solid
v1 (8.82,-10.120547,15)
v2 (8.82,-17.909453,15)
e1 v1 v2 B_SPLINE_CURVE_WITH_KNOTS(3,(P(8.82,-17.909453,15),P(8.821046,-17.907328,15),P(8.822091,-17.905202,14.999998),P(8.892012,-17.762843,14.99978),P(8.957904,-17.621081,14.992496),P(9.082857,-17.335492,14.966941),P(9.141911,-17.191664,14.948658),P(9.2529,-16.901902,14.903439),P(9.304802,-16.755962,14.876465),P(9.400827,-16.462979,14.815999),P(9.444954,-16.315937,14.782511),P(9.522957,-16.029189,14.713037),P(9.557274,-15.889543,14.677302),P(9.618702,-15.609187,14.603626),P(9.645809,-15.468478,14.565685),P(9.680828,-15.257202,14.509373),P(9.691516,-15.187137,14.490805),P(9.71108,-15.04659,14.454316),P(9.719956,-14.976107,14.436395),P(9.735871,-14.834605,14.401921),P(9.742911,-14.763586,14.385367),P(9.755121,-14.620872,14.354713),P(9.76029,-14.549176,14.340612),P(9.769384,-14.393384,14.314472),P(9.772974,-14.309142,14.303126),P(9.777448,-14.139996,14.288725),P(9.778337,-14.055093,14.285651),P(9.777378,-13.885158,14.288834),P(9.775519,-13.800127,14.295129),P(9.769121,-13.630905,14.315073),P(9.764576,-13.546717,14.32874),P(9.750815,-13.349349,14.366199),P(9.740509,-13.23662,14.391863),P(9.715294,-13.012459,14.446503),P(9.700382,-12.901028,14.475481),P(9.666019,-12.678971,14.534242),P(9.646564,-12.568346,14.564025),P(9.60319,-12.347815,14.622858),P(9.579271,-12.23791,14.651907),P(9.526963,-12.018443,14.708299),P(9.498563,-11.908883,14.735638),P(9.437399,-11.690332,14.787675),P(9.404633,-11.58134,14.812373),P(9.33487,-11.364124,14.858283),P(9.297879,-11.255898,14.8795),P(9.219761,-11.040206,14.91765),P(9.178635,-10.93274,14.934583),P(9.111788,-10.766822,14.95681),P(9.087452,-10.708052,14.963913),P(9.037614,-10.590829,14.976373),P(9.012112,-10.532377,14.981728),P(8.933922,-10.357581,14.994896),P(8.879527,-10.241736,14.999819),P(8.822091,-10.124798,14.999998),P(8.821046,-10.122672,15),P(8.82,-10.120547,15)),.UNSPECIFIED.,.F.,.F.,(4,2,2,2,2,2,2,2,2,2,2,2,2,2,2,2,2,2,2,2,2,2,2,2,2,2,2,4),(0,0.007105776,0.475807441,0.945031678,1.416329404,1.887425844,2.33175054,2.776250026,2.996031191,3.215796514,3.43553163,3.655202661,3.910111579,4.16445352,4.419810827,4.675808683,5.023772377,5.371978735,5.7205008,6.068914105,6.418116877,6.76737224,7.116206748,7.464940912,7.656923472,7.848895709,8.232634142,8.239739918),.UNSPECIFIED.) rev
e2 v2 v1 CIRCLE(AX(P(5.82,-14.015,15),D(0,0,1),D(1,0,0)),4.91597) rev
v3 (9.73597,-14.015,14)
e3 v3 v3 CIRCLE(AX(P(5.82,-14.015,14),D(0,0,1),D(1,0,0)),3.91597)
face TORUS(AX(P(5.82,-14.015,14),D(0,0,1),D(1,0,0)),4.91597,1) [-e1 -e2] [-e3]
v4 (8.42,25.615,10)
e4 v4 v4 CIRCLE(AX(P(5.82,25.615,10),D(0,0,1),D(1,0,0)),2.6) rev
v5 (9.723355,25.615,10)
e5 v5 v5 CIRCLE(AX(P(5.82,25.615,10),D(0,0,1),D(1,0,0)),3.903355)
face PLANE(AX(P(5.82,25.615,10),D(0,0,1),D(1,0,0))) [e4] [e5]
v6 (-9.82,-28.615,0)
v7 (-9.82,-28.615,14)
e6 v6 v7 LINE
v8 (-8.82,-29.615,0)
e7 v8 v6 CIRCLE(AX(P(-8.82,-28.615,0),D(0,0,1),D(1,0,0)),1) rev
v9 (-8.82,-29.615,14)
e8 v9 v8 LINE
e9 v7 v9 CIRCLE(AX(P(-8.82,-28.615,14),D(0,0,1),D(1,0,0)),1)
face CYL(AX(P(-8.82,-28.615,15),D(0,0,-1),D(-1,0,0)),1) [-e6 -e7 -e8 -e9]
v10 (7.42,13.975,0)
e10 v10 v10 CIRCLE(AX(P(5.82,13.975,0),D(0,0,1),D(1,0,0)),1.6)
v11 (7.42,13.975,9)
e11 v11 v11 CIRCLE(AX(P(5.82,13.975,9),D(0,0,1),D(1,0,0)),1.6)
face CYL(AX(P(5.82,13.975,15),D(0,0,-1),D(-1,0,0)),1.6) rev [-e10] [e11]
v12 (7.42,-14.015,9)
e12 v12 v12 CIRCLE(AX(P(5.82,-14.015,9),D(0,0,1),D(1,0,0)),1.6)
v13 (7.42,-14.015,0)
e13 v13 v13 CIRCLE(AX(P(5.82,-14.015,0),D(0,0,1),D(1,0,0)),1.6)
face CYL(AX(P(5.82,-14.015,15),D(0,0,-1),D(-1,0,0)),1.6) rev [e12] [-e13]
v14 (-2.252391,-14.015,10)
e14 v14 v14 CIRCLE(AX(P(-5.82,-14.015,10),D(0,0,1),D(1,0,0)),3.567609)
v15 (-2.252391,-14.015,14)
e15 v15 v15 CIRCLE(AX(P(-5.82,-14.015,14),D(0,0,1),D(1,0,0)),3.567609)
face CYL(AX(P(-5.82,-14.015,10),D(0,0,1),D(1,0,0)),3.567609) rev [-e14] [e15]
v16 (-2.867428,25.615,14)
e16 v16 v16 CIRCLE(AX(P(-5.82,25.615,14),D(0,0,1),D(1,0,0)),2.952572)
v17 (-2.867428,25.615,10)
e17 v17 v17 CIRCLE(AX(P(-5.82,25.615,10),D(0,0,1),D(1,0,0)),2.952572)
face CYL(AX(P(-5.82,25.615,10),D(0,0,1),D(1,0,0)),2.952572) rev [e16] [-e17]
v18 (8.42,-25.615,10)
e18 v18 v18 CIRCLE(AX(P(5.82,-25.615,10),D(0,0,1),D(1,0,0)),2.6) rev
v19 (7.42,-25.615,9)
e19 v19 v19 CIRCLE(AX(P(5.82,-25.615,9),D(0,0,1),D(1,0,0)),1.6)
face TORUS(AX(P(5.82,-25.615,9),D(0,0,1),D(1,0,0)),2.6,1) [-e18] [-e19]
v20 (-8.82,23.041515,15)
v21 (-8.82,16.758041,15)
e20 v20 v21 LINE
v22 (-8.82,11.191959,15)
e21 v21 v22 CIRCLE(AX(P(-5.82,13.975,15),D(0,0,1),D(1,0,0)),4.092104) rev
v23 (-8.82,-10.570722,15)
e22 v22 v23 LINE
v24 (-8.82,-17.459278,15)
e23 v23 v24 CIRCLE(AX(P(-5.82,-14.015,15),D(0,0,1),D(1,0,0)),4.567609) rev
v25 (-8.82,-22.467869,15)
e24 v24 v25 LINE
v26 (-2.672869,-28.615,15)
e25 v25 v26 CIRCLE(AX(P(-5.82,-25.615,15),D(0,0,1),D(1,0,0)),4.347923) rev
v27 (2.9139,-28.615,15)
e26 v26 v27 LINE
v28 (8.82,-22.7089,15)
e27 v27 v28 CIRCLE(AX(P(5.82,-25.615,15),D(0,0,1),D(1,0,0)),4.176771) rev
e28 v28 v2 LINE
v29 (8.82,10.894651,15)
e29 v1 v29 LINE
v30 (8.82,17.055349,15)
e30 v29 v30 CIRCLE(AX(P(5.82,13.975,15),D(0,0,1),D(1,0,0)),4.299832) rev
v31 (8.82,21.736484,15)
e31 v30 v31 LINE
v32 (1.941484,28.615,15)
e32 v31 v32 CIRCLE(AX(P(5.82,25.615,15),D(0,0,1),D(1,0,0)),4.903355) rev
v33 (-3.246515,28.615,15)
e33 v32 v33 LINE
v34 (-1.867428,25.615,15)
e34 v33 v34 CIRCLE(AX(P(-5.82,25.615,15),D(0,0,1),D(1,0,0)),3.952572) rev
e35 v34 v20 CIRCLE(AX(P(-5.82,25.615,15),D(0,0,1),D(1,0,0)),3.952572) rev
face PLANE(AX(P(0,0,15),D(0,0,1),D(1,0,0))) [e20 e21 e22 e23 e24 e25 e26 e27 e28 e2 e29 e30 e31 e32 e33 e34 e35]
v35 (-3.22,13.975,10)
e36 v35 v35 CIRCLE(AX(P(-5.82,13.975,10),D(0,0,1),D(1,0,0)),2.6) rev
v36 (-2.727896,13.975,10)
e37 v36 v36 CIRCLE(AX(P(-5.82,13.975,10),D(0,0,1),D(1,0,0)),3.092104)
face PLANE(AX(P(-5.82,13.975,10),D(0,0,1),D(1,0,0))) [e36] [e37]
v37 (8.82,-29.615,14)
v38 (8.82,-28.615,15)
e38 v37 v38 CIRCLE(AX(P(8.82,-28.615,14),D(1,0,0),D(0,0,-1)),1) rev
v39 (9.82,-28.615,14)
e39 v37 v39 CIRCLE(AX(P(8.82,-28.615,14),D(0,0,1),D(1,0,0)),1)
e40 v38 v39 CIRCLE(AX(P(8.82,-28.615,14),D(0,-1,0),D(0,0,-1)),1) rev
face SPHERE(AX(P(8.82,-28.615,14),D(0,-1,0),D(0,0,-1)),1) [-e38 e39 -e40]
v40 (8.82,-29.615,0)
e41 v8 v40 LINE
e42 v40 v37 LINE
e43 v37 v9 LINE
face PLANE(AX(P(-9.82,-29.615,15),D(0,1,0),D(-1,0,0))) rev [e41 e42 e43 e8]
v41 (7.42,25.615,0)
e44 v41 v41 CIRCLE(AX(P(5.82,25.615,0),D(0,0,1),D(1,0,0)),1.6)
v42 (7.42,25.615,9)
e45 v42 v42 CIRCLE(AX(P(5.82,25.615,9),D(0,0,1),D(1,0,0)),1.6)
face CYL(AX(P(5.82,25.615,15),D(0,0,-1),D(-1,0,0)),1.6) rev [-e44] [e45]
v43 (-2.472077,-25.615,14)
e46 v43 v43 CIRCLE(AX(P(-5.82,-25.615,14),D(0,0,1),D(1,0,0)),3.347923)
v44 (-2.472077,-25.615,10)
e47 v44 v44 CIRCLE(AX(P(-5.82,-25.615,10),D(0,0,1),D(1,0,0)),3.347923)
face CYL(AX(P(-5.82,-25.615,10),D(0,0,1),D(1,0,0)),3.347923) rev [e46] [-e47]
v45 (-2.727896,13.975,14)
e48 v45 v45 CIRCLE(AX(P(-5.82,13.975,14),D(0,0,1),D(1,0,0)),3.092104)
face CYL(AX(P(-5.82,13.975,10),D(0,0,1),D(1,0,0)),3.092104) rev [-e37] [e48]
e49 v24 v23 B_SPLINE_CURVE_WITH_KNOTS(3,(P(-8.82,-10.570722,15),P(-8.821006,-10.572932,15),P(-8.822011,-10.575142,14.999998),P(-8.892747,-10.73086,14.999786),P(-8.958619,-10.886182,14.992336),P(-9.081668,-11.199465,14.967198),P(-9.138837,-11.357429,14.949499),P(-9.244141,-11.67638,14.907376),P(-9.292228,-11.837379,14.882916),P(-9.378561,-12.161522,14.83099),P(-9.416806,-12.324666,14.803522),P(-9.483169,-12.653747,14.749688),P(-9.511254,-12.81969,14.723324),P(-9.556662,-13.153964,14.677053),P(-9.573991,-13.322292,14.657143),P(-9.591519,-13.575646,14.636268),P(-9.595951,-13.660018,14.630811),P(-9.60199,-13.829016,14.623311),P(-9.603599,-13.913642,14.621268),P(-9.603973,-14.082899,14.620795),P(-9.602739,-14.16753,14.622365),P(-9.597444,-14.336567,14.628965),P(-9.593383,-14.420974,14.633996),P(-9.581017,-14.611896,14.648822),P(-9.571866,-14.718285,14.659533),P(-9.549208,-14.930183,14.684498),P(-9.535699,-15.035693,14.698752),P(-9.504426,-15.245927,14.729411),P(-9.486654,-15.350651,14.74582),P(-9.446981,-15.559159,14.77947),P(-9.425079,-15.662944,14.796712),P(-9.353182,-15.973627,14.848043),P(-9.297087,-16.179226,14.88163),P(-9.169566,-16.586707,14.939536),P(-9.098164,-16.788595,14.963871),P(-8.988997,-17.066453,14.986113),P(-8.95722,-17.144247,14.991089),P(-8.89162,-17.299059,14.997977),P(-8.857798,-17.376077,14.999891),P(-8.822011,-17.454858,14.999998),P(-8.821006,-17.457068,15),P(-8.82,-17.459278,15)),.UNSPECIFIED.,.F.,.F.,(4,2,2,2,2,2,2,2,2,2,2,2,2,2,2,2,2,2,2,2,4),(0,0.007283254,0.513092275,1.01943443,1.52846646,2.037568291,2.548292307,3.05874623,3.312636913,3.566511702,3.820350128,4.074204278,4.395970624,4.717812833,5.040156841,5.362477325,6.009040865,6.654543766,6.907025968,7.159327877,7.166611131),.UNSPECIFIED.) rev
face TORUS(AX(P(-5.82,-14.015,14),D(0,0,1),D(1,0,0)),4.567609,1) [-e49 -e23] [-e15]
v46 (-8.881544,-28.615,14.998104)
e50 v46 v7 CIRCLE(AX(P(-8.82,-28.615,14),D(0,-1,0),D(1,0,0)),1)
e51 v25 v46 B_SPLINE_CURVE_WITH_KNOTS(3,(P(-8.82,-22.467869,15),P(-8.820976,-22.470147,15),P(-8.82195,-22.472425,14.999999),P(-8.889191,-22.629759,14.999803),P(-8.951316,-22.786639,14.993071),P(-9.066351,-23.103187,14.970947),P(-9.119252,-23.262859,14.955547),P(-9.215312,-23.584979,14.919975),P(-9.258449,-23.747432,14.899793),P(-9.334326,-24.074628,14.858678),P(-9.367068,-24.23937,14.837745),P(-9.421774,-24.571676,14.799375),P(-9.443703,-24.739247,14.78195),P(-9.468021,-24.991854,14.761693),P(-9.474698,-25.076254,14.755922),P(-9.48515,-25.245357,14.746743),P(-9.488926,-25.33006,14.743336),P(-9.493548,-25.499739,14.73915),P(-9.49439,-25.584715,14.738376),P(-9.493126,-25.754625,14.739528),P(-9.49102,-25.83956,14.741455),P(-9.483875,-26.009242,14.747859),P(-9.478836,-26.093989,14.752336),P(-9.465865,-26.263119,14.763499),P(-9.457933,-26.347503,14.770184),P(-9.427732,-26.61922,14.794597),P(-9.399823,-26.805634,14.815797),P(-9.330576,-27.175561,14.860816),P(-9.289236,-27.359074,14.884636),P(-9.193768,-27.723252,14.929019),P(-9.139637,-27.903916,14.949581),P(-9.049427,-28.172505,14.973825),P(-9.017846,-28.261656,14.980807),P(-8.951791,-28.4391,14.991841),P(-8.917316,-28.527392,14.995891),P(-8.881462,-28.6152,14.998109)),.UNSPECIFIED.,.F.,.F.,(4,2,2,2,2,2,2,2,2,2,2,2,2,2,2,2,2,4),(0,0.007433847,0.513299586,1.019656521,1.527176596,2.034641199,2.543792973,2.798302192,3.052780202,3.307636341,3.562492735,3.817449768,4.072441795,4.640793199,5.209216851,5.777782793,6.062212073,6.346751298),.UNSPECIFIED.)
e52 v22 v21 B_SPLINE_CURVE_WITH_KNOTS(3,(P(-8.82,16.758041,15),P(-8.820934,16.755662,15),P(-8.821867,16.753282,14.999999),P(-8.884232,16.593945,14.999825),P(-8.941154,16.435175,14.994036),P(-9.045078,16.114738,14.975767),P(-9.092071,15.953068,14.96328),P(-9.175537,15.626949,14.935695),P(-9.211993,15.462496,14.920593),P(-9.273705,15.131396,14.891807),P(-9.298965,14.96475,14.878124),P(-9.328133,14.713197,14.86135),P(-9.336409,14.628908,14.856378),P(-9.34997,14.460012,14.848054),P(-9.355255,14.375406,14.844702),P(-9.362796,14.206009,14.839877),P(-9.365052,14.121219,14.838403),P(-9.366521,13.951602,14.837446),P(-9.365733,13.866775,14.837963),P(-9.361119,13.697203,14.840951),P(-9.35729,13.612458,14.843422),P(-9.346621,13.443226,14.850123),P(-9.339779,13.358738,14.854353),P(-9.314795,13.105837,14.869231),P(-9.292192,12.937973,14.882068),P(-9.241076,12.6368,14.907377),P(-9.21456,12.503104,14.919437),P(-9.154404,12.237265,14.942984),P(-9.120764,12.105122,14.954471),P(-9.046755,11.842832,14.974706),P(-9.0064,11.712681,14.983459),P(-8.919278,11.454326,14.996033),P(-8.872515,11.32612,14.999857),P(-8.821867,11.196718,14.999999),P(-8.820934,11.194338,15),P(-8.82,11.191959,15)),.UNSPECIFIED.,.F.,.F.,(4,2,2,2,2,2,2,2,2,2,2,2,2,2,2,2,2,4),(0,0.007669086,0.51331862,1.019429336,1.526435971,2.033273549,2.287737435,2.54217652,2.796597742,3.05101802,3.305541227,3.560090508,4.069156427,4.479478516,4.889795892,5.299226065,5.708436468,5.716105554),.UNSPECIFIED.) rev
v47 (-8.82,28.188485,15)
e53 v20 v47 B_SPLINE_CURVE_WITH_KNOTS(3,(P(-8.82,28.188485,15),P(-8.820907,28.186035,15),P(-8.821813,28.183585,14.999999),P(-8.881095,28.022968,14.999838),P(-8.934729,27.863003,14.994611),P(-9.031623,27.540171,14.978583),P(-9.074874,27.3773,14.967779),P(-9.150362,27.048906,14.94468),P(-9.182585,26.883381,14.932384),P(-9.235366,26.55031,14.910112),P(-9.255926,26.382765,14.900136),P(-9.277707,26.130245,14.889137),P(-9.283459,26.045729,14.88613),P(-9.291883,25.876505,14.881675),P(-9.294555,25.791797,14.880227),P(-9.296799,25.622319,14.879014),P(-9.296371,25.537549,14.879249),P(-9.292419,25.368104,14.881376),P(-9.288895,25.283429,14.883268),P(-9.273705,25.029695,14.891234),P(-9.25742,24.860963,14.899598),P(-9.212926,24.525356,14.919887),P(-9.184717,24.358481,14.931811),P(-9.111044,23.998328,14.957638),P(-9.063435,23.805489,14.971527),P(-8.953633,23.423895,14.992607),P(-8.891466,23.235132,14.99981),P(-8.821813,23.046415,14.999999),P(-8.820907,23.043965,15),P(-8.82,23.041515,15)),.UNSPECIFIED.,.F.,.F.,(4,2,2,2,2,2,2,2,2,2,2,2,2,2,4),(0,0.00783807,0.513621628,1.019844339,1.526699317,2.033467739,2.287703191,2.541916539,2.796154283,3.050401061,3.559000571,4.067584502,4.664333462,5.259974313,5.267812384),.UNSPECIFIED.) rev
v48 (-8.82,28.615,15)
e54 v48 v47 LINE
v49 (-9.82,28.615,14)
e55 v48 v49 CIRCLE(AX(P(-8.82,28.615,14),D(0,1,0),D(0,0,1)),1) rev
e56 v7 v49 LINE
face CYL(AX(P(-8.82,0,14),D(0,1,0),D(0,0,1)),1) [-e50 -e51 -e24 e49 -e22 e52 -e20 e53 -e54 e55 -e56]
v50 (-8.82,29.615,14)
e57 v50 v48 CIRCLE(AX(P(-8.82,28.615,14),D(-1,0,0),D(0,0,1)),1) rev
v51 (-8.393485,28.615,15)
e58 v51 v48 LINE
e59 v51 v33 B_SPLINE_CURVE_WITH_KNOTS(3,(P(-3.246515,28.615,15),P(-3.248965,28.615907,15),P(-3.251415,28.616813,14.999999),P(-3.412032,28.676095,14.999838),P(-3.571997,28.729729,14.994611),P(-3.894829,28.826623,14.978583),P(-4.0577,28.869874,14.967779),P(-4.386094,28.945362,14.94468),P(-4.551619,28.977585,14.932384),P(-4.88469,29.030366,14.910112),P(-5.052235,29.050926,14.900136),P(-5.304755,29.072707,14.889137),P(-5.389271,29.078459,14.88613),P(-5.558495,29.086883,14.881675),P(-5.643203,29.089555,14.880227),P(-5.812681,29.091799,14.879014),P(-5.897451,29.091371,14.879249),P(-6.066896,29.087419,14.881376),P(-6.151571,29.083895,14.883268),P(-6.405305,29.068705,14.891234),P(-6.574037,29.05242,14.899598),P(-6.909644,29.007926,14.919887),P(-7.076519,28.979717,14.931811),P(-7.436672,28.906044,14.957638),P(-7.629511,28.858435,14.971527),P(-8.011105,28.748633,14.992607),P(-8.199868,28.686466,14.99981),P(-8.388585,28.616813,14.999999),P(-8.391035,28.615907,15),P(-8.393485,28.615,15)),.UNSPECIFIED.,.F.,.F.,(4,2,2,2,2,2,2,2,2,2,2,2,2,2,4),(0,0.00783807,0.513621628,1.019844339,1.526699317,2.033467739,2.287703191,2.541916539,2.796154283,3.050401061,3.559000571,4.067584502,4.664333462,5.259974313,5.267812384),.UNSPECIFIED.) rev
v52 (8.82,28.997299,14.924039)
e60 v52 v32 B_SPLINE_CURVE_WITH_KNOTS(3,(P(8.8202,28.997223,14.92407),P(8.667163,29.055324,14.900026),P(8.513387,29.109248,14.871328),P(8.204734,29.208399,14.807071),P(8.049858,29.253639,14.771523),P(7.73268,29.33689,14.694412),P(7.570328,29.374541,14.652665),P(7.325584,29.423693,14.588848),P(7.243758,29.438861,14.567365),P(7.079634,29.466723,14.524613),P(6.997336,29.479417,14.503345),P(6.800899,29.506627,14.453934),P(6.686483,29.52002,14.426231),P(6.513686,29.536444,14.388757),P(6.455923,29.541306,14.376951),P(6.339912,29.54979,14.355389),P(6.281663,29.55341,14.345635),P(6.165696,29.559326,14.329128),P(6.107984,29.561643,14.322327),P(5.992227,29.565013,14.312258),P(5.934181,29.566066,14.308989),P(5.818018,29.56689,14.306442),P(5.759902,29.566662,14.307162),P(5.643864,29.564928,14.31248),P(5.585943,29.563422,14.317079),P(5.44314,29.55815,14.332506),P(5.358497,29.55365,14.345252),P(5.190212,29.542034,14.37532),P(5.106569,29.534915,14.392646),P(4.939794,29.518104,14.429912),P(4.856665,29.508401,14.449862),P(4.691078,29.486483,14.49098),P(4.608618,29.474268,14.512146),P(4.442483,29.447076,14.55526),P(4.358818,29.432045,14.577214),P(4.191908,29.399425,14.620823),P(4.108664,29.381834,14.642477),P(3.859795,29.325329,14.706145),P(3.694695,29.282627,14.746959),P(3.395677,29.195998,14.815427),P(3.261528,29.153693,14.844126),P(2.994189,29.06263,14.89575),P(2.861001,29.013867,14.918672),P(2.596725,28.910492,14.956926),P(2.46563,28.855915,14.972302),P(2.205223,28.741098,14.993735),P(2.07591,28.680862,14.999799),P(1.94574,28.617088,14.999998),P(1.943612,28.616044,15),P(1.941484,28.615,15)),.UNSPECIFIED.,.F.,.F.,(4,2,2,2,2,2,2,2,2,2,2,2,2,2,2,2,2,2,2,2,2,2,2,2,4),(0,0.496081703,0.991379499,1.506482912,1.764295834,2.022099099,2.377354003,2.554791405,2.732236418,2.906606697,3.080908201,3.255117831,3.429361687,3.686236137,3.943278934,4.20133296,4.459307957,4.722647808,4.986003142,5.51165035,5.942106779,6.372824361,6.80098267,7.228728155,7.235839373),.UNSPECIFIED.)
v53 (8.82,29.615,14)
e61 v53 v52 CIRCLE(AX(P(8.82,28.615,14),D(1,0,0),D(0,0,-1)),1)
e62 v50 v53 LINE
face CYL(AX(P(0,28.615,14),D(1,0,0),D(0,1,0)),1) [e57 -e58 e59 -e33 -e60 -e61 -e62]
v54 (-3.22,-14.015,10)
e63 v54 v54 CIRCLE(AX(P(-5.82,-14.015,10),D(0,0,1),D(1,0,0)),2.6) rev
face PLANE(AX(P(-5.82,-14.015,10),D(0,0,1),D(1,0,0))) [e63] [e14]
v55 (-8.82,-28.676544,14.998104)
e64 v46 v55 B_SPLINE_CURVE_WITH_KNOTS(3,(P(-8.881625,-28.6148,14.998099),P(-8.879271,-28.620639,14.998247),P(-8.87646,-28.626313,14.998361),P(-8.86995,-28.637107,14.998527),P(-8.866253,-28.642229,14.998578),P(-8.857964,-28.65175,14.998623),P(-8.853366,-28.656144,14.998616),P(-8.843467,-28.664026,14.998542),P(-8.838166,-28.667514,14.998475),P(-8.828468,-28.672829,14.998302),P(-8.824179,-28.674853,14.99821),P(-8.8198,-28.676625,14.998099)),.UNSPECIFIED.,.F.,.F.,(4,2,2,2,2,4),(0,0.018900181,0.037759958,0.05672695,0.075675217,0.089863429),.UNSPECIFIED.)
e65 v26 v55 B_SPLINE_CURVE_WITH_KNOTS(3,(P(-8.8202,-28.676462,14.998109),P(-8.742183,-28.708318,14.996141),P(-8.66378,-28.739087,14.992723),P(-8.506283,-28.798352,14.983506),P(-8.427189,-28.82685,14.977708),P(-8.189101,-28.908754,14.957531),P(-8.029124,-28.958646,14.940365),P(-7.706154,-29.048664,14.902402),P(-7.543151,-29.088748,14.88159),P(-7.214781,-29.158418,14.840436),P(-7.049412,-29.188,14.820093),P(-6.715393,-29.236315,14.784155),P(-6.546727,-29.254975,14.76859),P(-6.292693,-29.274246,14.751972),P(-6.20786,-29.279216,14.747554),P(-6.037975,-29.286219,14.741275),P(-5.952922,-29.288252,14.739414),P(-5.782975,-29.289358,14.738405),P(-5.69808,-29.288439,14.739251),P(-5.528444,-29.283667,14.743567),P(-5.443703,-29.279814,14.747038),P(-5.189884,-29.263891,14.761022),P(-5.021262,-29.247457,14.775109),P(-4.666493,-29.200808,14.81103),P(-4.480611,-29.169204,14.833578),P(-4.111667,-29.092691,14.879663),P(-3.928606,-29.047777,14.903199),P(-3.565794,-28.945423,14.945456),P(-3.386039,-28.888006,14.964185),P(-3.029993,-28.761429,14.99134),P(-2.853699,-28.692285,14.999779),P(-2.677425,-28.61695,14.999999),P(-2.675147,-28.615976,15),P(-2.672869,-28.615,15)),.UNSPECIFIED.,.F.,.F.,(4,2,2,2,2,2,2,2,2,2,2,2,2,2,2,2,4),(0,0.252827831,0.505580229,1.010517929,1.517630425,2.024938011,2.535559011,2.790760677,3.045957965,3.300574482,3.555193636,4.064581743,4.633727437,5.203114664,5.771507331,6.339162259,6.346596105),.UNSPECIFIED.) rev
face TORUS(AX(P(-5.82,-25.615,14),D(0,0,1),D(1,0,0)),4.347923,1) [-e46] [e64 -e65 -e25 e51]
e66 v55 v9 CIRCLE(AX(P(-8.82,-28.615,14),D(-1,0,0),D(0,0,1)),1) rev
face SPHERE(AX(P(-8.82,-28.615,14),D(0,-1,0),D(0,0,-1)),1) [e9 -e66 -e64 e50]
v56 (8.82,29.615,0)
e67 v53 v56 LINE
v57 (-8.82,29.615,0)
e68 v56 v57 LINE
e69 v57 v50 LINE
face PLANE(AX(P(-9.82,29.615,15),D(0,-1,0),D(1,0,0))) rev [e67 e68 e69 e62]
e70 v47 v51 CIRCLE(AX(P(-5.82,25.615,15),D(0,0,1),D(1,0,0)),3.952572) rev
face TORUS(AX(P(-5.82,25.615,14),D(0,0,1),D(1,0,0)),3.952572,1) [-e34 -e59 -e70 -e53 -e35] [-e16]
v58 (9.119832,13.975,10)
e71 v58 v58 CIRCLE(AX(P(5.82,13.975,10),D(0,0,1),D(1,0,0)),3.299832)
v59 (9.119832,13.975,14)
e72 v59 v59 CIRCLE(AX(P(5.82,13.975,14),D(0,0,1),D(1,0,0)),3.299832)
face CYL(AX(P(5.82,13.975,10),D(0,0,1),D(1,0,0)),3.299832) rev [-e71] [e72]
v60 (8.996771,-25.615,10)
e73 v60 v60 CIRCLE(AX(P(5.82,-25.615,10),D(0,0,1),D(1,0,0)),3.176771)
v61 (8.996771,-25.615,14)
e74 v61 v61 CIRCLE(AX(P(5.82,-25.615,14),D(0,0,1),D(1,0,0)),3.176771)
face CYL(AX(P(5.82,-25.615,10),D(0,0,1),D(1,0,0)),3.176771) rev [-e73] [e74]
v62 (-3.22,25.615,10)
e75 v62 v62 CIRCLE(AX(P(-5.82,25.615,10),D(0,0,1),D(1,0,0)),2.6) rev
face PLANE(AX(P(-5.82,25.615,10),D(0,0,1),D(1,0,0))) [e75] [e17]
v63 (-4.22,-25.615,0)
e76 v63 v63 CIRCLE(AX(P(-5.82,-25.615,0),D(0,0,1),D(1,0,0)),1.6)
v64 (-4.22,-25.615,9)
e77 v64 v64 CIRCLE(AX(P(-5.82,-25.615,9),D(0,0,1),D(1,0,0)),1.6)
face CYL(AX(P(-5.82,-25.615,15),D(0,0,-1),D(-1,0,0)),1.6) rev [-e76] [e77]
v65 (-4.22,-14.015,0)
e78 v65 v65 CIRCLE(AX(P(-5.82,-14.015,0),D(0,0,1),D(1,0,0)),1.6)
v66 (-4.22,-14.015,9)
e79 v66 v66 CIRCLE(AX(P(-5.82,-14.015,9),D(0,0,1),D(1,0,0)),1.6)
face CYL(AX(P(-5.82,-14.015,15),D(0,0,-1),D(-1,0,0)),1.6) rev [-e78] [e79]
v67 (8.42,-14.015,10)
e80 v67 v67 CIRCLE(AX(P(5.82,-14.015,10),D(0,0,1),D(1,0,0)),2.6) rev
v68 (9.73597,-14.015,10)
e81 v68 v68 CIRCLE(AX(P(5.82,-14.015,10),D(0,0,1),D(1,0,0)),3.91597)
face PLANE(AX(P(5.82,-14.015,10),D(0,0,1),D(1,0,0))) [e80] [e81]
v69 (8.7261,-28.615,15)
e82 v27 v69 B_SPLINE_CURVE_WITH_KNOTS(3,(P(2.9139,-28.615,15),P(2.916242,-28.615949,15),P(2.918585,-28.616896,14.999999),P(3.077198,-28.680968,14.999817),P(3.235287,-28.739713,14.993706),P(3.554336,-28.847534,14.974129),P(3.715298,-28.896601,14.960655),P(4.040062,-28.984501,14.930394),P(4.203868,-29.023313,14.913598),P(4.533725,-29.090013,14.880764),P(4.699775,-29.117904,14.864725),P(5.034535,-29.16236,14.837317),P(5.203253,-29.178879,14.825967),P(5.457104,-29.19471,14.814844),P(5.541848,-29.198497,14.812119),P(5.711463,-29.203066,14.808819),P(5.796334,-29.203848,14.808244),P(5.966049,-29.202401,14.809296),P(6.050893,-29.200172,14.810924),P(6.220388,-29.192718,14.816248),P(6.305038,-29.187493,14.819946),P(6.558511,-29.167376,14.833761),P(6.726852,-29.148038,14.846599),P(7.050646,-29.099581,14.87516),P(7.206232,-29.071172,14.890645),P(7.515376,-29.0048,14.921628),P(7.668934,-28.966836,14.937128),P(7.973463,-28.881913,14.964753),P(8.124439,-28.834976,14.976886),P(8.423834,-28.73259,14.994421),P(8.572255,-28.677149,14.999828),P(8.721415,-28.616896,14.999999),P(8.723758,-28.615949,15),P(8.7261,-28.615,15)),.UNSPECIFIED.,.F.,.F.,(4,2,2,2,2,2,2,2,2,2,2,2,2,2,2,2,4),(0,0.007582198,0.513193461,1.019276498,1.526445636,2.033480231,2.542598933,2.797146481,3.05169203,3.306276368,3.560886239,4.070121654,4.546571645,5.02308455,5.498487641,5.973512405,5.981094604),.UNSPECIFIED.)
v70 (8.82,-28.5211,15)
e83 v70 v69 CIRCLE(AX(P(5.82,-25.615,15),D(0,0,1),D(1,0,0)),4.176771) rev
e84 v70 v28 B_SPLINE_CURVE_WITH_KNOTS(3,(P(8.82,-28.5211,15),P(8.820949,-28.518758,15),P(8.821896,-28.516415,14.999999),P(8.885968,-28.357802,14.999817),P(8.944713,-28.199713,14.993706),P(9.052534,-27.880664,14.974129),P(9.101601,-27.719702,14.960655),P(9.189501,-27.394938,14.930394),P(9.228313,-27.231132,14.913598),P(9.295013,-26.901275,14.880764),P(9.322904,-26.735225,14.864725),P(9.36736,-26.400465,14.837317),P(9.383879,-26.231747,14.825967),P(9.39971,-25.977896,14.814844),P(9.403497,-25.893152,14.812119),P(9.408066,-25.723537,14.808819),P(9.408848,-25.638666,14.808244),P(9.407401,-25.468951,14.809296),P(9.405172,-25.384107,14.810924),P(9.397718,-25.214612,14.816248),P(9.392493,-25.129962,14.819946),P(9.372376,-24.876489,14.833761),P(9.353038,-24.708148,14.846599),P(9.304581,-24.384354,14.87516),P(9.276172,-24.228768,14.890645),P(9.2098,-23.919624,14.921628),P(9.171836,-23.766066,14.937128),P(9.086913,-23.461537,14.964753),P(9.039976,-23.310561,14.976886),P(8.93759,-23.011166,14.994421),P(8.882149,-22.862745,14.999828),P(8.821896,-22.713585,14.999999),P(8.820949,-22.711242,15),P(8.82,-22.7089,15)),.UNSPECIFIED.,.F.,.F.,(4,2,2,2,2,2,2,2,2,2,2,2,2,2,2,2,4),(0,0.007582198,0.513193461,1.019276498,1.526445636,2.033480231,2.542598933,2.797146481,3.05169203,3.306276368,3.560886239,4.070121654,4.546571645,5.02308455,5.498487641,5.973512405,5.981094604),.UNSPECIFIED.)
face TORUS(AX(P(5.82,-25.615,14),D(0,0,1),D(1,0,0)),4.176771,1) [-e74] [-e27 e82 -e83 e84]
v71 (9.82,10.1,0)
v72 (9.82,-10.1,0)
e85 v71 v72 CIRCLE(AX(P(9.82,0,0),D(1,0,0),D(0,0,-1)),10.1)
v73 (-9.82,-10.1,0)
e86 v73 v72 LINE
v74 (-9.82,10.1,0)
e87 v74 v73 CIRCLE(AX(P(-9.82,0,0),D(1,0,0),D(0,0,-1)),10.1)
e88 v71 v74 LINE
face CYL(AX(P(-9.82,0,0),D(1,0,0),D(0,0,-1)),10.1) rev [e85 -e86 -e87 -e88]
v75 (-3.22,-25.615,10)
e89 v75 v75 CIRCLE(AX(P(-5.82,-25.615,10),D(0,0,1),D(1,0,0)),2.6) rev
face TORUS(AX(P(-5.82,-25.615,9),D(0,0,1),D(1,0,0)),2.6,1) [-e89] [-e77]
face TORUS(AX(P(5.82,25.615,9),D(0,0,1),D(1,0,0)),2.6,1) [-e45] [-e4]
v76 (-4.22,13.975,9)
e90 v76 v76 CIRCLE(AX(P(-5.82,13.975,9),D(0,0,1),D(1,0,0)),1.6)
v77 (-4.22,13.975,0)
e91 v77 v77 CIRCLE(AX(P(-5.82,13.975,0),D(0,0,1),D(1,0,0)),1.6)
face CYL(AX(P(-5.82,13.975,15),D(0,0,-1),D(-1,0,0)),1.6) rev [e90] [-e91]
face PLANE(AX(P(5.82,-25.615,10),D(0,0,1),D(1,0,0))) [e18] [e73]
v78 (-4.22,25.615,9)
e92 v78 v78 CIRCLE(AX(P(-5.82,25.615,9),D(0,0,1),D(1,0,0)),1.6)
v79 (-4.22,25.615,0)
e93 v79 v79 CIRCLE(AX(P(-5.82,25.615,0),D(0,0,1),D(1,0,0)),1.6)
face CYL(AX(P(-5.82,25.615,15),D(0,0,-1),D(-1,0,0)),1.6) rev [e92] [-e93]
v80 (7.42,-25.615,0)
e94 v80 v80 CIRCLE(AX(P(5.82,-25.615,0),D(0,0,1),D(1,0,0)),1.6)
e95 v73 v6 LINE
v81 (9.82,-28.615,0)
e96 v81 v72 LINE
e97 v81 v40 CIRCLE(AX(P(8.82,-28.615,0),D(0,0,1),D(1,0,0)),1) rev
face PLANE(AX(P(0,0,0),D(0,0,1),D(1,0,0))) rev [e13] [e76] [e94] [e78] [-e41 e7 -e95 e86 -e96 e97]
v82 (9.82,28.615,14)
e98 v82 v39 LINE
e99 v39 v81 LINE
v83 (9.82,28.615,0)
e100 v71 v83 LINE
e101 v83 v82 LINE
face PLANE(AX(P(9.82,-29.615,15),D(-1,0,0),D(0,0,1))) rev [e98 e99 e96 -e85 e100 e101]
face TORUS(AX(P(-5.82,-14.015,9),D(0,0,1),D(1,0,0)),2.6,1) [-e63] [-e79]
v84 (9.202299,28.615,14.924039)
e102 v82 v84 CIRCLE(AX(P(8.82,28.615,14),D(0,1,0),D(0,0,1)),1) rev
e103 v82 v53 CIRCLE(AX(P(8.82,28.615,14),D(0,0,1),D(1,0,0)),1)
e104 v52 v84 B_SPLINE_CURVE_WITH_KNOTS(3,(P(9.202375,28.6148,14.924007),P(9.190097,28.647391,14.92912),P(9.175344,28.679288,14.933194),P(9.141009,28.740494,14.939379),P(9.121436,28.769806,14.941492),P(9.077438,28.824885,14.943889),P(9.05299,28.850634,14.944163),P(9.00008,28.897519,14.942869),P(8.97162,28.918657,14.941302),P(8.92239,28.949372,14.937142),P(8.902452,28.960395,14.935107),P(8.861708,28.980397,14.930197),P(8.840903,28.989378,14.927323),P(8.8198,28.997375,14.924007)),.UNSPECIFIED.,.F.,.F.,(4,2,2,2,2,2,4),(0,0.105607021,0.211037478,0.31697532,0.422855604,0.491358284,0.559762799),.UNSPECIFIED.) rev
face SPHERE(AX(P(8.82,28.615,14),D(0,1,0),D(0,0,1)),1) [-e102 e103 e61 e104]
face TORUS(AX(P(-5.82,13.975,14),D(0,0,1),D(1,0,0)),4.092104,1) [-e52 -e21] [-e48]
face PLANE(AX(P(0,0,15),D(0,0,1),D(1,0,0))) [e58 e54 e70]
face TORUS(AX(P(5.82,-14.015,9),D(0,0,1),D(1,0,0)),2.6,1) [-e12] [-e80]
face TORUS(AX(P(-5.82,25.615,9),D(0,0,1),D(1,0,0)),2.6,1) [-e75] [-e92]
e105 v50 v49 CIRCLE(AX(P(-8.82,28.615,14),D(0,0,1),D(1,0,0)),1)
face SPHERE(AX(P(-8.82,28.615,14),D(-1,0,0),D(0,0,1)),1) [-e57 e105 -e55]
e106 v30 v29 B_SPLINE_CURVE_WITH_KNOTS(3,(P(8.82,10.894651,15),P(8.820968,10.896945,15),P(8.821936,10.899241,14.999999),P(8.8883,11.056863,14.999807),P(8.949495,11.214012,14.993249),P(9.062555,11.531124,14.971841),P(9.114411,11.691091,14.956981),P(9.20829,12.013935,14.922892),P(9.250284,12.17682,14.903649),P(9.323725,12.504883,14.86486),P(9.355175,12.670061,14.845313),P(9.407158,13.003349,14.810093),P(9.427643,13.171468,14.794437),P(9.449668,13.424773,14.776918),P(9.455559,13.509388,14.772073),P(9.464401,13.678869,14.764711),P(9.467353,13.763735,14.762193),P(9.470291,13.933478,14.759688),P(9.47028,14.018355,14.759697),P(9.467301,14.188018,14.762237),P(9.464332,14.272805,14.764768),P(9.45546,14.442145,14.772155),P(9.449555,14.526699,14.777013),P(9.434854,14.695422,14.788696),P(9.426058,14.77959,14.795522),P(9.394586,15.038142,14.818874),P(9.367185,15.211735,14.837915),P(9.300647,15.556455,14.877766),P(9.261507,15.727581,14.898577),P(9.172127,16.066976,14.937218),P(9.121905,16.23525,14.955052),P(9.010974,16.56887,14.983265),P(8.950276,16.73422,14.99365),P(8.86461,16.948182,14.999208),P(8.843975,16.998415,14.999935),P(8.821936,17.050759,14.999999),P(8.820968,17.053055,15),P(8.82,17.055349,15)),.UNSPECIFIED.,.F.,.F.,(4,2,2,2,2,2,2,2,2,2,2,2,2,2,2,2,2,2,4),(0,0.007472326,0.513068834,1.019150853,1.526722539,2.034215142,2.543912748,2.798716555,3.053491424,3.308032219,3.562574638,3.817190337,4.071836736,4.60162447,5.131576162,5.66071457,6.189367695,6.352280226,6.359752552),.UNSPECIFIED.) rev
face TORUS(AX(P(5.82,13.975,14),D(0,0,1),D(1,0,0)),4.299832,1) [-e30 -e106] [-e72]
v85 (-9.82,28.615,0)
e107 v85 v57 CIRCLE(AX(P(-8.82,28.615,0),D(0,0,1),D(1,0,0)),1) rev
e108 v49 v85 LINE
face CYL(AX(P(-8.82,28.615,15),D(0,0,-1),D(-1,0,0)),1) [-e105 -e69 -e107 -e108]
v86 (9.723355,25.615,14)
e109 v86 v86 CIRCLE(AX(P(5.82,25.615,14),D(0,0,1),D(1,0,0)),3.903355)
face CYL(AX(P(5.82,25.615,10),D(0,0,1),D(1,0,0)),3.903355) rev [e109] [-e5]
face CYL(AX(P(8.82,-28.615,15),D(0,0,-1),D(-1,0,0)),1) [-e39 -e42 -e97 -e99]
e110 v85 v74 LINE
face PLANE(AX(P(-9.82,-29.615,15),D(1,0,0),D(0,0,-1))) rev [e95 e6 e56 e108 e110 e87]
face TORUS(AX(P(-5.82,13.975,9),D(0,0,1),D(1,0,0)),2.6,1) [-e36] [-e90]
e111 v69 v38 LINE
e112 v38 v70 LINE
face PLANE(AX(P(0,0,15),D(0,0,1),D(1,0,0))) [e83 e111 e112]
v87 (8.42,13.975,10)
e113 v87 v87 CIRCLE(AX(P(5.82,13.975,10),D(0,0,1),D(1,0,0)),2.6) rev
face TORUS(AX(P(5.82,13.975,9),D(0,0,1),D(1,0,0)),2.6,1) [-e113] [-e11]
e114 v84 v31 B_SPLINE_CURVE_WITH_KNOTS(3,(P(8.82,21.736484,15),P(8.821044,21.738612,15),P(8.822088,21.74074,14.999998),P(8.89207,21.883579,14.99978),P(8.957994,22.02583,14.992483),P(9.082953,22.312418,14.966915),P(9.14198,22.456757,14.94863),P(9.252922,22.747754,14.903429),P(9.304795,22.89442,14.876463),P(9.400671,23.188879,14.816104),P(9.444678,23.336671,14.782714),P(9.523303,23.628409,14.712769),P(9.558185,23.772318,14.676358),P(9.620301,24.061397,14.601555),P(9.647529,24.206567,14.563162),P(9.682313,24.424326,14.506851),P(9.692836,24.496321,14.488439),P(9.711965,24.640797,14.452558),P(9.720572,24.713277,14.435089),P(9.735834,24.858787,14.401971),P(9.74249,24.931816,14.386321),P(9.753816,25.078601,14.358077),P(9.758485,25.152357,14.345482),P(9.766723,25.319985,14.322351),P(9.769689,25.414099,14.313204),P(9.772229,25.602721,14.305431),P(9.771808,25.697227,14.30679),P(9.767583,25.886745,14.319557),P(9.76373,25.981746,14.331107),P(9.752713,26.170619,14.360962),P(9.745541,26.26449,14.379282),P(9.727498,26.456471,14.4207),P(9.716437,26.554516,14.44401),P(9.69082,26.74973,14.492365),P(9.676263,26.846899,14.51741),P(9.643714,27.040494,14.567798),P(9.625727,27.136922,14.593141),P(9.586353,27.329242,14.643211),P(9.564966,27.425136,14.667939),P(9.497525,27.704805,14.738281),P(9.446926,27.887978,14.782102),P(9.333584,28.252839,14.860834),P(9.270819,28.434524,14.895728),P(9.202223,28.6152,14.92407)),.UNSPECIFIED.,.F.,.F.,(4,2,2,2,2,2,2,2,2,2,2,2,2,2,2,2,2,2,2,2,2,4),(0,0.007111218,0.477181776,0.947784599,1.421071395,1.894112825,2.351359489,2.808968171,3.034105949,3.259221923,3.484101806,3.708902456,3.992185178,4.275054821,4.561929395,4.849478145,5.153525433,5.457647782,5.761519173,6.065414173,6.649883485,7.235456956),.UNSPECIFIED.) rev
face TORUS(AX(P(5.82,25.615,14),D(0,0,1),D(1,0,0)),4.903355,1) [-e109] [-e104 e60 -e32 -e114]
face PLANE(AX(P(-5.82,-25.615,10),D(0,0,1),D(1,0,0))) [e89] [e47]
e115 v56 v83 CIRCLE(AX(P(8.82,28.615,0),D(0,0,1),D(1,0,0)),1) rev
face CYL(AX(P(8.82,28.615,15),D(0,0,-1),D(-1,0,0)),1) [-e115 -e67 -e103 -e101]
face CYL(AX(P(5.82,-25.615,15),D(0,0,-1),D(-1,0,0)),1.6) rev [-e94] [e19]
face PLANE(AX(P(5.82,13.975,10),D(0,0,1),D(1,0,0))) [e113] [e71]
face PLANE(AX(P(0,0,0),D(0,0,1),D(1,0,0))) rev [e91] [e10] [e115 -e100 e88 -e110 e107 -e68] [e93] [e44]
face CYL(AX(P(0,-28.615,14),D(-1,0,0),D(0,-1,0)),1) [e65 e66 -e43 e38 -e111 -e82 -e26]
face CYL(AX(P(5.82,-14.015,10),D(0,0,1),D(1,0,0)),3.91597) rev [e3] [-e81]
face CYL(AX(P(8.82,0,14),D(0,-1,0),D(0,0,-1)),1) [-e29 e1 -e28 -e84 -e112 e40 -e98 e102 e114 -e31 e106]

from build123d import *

# Parameters (mm, degrees)
SKETCH1_W           = 59.23
SKETCH1_H           = 19.64
SKETCH1_R           = 1.6
BOSS_EXTRUDE1_DEPTH = 15
SKETCH2_R           = 2.952572206
SKETCH2_R_2         = 3.903354956
SKETCH2_R_3         = 3.092104455
SKETCH2_R_4         = 3.299831719
SKETCH2_R_5         = 3.567608527
SKETCH2_R_6         = 3.34792304
SKETCH2_R_7         = 3.176771323
SKETCH2_R_8         = 3.915970236
CUT_EXTRUDE1_DEPTH  = 5
SKETCH6_R           = 10.1
CUT_EXTRUDE2_DEPTH  = 39.571723127
FILLET1_R           = 1


with BuildPart() as part:
    # Sketch1 → Boss-Extrude1 (new body)
    with BuildSketch(Plane(origin=(0, 0, 0), x_dir=(0, 1, 0), z_dir=(0, 0, 1))):
        Rectangle(SKETCH1_W, SKETCH1_H)
        with Locations(Location((-25.615, 5.82, 0), (0, 0, 270))):
            Circle(SKETCH1_R, mode=Mode.SUBTRACT)
        with Locations(Location((25.615, 5.82, 0), (0, 0, 270))):
            Circle(SKETCH1_R, mode=Mode.SUBTRACT)
        with Locations(Location((25.615, -5.82, 0), (0, 0, 270))):
            Circle(SKETCH1_R, mode=Mode.SUBTRACT)
        with Locations(Location((-25.615, -5.82, 0), (0, 0, 270))):
            Circle(SKETCH1_R, mode=Mode.SUBTRACT)
        with Locations(Location((-14.015, 5.82, 0), (0, 0, 270))):
            Circle(SKETCH1_R, mode=Mode.SUBTRACT)
        with Locations(Location((-14.015, -5.82, 0), (0, 0, 270))):
            Circle(SKETCH1_R, mode=Mode.SUBTRACT)
        with Locations(Location((13.975, -5.82, 0), (0, 0, 270))):
            Circle(SKETCH1_R, mode=Mode.SUBTRACT)
        with Locations(Location((13.975, 5.82, 0), (0, 0, 270))):
            Circle(SKETCH1_R, mode=Mode.SUBTRACT)
    extrude(amount=BOSS_EXTRUDE1_DEPTH)

    # Sketch2 → Cut-Extrude1 (cut)
    with BuildSketch(Plane.XY.offset(15)):
        with Locations((-5.82, 25.615)):
            Circle(SKETCH2_R)
        with Locations((5.82, 25.615)):
            Circle(SKETCH2_R_2)
        with Locations((-5.82, 13.975)):
            Circle(SKETCH2_R_3)
        with Locations((5.82, 13.975)):
            Circle(SKETCH2_R_4)
        with Locations((-5.82, -14.015)):
            Circle(SKETCH2_R_5)
        with Locations((-5.82, -25.615)):
            Circle(SKETCH2_R_6)
        with Locations((5.82, -25.615)):
            Circle(SKETCH2_R_7)
        with Locations((5.82, -14.015)):
            Circle(SKETCH2_R_8)
    extrude(amount=-CUT_EXTRUDE1_DEPTH, mode=Mode.SUBTRACT)

    # Sketch6 → Cut-Extrude2 (cut, through all)
    with BuildSketch(Plane.YZ.offset(9.82)):
        Circle(SKETCH6_R)
    extrude(amount=-CUT_EXTRUDE2_DEPTH, mode=Mode.SUBTRACT)

    # Fillet1
    # the kernel refuses this fillet: 1 mm, written as the material it takes off along each edge
    with BuildSketch(Plane(origin=(-8.82, 28.615, 14), x_dir=(0, 1, 0), z_dir=(-1, 0, 0))) as fillet1_piece_1_section:
        Polygon((0, 0), (FILLET1_R, 0), (FILLET1_R, -FILLET1_R), (0, -FILLET1_R), align=None)
    fillet1_piece_1 = extrude(amount=FILLET1_R, mode=Mode.PRIVATE)
    fillet1_piece_1 = fillet1_piece_1 - Plane(origin=(-8.82, 28.615, 14), x_dir=(0, -0.7071067811865475, -0.7071067811865475), z_dir=(-1, 0, 0)) * Sphere(FILLET1_R, mode=Mode.PRIVATE)
    add(fillet1_piece_1, mode=Mode.SUBTRACT)
    with BuildSketch(Plane(origin=(8.82, 28.615, 14), x_dir=(0, 0, 1), z_dir=(0, 1, 0))) as fillet1_piece_2_section:
        Polygon((0, 0), (FILLET1_R, 0), (FILLET1_R, FILLET1_R), (0, FILLET1_R), align=None)
    fillet1_piece_2 = extrude(amount=FILLET1_R, mode=Mode.PRIVATE)
    fillet1_piece_2 = fillet1_piece_2 - Plane(origin=(8.82, 28.615, 14), x_dir=(-0.7071067811865475, 0, -0.7071067811865475), z_dir=(0, 1, 0)) * Sphere(FILLET1_R, mode=Mode.PRIVATE)
    add(fillet1_piece_2, mode=Mode.SUBTRACT)
    with BuildSketch(Plane(origin=(-8.82, -28.615, 14), x_dir=(0, 0, 1), z_dir=(-1, 0, 0))) as fillet1_piece_3_section:
        Polygon((0, 0), (FILLET1_R, 0), (FILLET1_R, -FILLET1_R), (0, -FILLET1_R), align=None)
    fillet1_piece_3 = extrude(amount=FILLET1_R, mode=Mode.PRIVATE)
    fillet1_piece_3 = fillet1_piece_3 - Plane(origin=(-8.82, -28.615, 14), x_dir=(0, 0.7071067811865475, -0.7071067811865475), z_dir=(-1, 0, 0)) * Sphere(FILLET1_R, mode=Mode.PRIVATE)
    add(fillet1_piece_3, mode=Mode.SUBTRACT)
    with BuildSketch(Plane(origin=(8.82, -28.615, 14), x_dir=(0, -1, 0), z_dir=(0, 0, 1))) as fillet1_piece_4_section:
        Polygon((0, 0), (FILLET1_R, 0), (FILLET1_R, FILLET1_R), (0, FILLET1_R), align=None)
    fillet1_piece_4 = extrude(amount=FILLET1_R, mode=Mode.PRIVATE)
    fillet1_piece_4 = fillet1_piece_4 - Plane(origin=(8.82, -28.615, 14), x_dir=(-0.7071067811865477, 0.7071067811865475, 0), z_dir=(0, 0, 1)) * Sphere(FILLET1_R, mode=Mode.PRIVATE)
    add(fillet1_piece_4, mode=Mode.SUBTRACT)
    with BuildSketch(Plane(origin=(-8.82, 29.615, 15), x_dir=(0, 0, -1), z_dir=(1, 0, 0))) as fillet1_piece_5:
        with BuildLine():
            CenterArc((FILLET1_R, -FILLET1_R), FILLET1_R, 90, 90)
            Line((0, -FILLET1_R), (0, 0))
            Line((0, 0), (FILLET1_R, 0))
        make_face()
    extrude(amount=17.64, mode=Mode.SUBTRACT)
    with BuildSketch(Plane(origin=(-9.82, -28.615, 15), x_dir=(0, 0, -1), z_dir=(0, 1, 0))) as fillet1_piece_6:
        with BuildLine():
            CenterArc((FILLET1_R, -FILLET1_R), FILLET1_R, 90, 90)
            Line((0, -FILLET1_R), (0, 0))
            Line((0, 0), (FILLET1_R, 0))
        make_face()
    extrude(amount=57.23, mode=Mode.SUBTRACT)
    with BuildSketch(Plane(origin=(8.82, -29.615, 15), x_dir=(0, 1, 0), z_dir=(-1, 0, 0))) as fillet1_piece_7:
        with BuildLine():
            CenterArc((FILLET1_R, FILLET1_R), FILLET1_R, 180, 90)
            Line((0, FILLET1_R), (0, 0))
            Line((0, 0), (FILLET1_R, 0))
        make_face()
    extrude(amount=17.64, mode=Mode.SUBTRACT)
    with BuildSketch(Plane(origin=(-5.82, -14.015, 10), x_dir=(1, 0, 0), z_dir=(0, 1, 0))) as fillet1_piece_8:
        with BuildLine():
            CenterArc((1.6 + FILLET1_R, FILLET1_R), FILLET1_R, 180, 90)
            Line((1.6 + FILLET1_R, 0), (1.6, 0))
            Line((1.6, 0), (1.6, FILLET1_R))
        make_face()
    revolve(axis=Axis((-5.82, -14.015, 10), (0, 0, -1)), mode=Mode.SUBTRACT)
    with BuildSketch(Plane(origin=(-5.82, -14.015, 15), x_dir=(1, 0, 0), z_dir=(0, -1, 0))) as fillet1_piece_9:
        with BuildLine():
            CenterArc((3.567608527 + FILLET1_R, -FILLET1_R), FILLET1_R, 90, 90)
            Line((3.567608527, -FILLET1_R), (3.567608527, 0))
            Line((3.567608527, 0), (3.567608527 + FILLET1_R, 0))
        make_face()
    revolve(axis=Axis((-5.82, -14.015, 15), (0, 0, 1)), mode=Mode.SUBTRACT)
    with BuildSketch(Plane(origin=(5.82, 13.975, 10), x_dir=(1, 0, 0), z_dir=(0, 1, 0))) as fillet1_piece_10:
        with BuildLine():
            CenterArc((1.6 + FILLET1_R, FILLET1_R), FILLET1_R, 180, 90)
            Line((1.6 + FILLET1_R, 0), (1.6, 0))
            Line((1.6, 0), (1.6, FILLET1_R))
        make_face()
    revolve(axis=Axis((5.82, 13.975, 10), (0, 0, -1)), mode=Mode.SUBTRACT)
    with BuildSketch(Plane(origin=(5.82, 13.975, 15), x_dir=(1, 0, 0), z_dir=(0, -1, 0))) as fillet1_piece_11:
        with BuildLine():
            CenterArc((3.299831719 + FILLET1_R, -FILLET1_R), FILLET1_R, 90, 90)
            Line((3.299831719, -FILLET1_R), (3.299831719, 0))
            Line((3.299831719, 0), (3.299831719 + FILLET1_R, 0))
        make_face()
    revolve(axis=Axis((5.82, 13.975, 15), (0, 0, 1)), mode=Mode.SUBTRACT)
    with BuildSketch(Plane(origin=(-5.82, 13.975, 10), x_dir=(1, 0, 0), z_dir=(0, 1, 0))) as fillet1_piece_12:
        with BuildLine():
            CenterArc((1.6 + FILLET1_R, FILLET1_R), FILLET1_R, 180, 90)
            Line((1.6 + FILLET1_R, 0), (1.6, 0))
            Line((1.6, 0), (1.6, FILLET1_R))
        make_face()
    revolve(axis=Axis((-5.82, 13.975, 10), (0, 0, -1)), mode=Mode.SUBTRACT)
    with BuildSketch(Plane(origin=(-5.82, 13.975, 15), x_dir=(1, 0, 0), z_dir=(0, -1, 0))) as fillet1_piece_13:
        with BuildLine():
            CenterArc((3.092104455 + FILLET1_R, -FILLET1_R), FILLET1_R, 90, 90)
            Line((3.092104455, -FILLET1_R), (3.092104455, 0))
            Line((3.092104455, 0), (3.092104455 + FILLET1_R, 0))
        make_face()
    revolve(axis=Axis((-5.82, 13.975, 15), (0, 0, 1)), mode=Mode.SUBTRACT)
    with BuildSketch(Plane(origin=(5.82, 25.615, 10), x_dir=(1, 0, 0), z_dir=(0, 1, 0))) as fillet1_piece_14:
        with BuildLine():
            CenterArc((1.6 + FILLET1_R, FILLET1_R), FILLET1_R, 180, 90)
            Line((1.6 + FILLET1_R, 0), (1.6, 0))
            Line((1.6, 0), (1.6, FILLET1_R))
        make_face()
    revolve(axis=Axis((5.82, 25.615, 10), (0, 0, -1)), mode=Mode.SUBTRACT)
    with BuildSketch(Plane(origin=(5.82, 25.615, 15), x_dir=(1, 0, 0), z_dir=(0, -1, 0))) as fillet1_piece_15:
        with BuildLine():
            CenterArc((3.903354956 + FILLET1_R, -FILLET1_R), FILLET1_R, 90, 90)
            Line((3.903354956, -FILLET1_R), (3.903354956, 0))
            Line((3.903354956, 0), (3.903354956 + FILLET1_R, 0))
        make_face()
    revolve(axis=Axis((5.82, 25.615, 15), (0, 0, 1)), mode=Mode.SUBTRACT)
    with BuildSketch(Plane(origin=(-5.82, -25.615, 10), x_dir=(1, 0, 0), z_dir=(0, 1, 0))) as fillet1_piece_16:
        with BuildLine():
            CenterArc((1.6 + FILLET1_R, FILLET1_R), FILLET1_R, 180, 90)
            Line((1.6 + FILLET1_R, 0), (1.6, 0))
            Line((1.6, 0), (1.6, FILLET1_R))
        make_face()
    revolve(axis=Axis((-5.82, -25.615, 10), (0, 0, -1)), mode=Mode.SUBTRACT)
    with BuildSketch(Plane(origin=(-5.82, -25.615, 15), x_dir=(1, 0, 0), z_dir=(0, -1, 0))) as fillet1_piece_17:
        with BuildLine():
            CenterArc((3.34792304 + FILLET1_R, -FILLET1_R), FILLET1_R, 90, 90)
            Line((3.34792304, -FILLET1_R), (3.34792304, 0))
            Line((3.34792304, 0), (3.34792304 + FILLET1_R, 0))
        make_face()
    revolve(axis=Axis((-5.82, -25.615, 15), (0, 0, 1)), mode=Mode.SUBTRACT)
    with BuildSketch(Plane(origin=(5.82, -25.615, 10), x_dir=(1, 0, 0), z_dir=(0, 1, 0))) as fillet1_piece_18:
        with BuildLine():
            CenterArc((1.6 + FILLET1_R, FILLET1_R), FILLET1_R, 180, 90)
            Line((1.6 + FILLET1_R, 0), (1.6, 0))
            Line((1.6, 0), (1.6, FILLET1_R))
        make_face()
    revolve(axis=Axis((5.82, -25.615, 10), (0, 0, -1)), mode=Mode.SUBTRACT)
    with BuildSketch(Plane(origin=(5.82, -25.615, 15), x_dir=(1, 0, 0), z_dir=(0, -1, 0))) as fillet1_piece_19:
        with BuildLine():
            CenterArc((3.176771323 + FILLET1_R, -FILLET1_R), FILLET1_R, 90, 90)
            Line((3.176771323, -FILLET1_R), (3.176771323, 0))
            Line((3.176771323, 0), (3.176771323 + FILLET1_R, 0))
        make_face()
    revolve(axis=Axis((5.82, -25.615, 15), (0, 0, 1)), mode=Mode.SUBTRACT)
    with BuildSketch(Plane(origin=(5.82, -14.015, 10), x_dir=(1, 0, 0), z_dir=(0, 1, 0))) as fillet1_piece_20:
        with BuildLine():
            CenterArc((1.6 + FILLET1_R, FILLET1_R), FILLET1_R, 180, 90)
            Line((1.6 + FILLET1_R, 0), (1.6, 0))
            Line((1.6, 0), (1.6, FILLET1_R))
        make_face()
    revolve(axis=Axis((5.82, -14.015, 10), (0, 0, -1)), mode=Mode.SUBTRACT)
    with BuildSketch(Plane(origin=(5.82, -14.015, 15), x_dir=(1, 0, 0), z_dir=(0, -1, 0))) as fillet1_piece_21:
        with BuildLine():
            CenterArc((3.915970236 + FILLET1_R, -FILLET1_R), FILLET1_R, 90, 90)
            Line((3.915970236, -FILLET1_R), (3.915970236, 0))
            Line((3.915970236, 0), (3.915970236 + FILLET1_R, 0))
        make_face()
    revolve(axis=Axis((5.82, -14.015, 15), (0, 0, 1)), mode=Mode.SUBTRACT)
    with BuildSketch(Plane(origin=(-9.82, -29.615, -2.5), x_dir=(0, 1, 0), z_dir=(0, 0, 1)), Plane(origin=(9.82, -29.615, -2.5), x_dir=(-1, 0, 0), z_dir=(0, 0, 1))) as fillet1_piece_22:
        with BuildLine():
            CenterArc((FILLET1_R, -FILLET1_R), FILLET1_R, 90, 90)
            Line((0, -FILLET1_R), (0, 0))
            Line((0, 0), (FILLET1_R, 0))
        make_face()
    extrude(amount=16.5, mode=Mode.SUBTRACT)
    with BuildSketch(Plane(origin=(-9.82, 29.615, -2.5), x_dir=(0, -1, 0), z_dir=(0, 0, 1)), Plane(origin=(9.82, 29.615, -2.5), x_dir=(-1, 0, 0), z_dir=(0, 0, 1))) as fillet1_piece_23:
        with BuildLine():
            CenterArc((FILLET1_R, FILLET1_R), FILLET1_R, 180, 90)
            Line((0, FILLET1_R), (0, 0))
            Line((0, 0), (FILLET1_R, 0))
        make_face()
    extrude(amount=16.5, mode=Mode.SUBTRACT)
    with BuildSketch(Plane(origin=(-5.82, 25.615, 10), x_dir=(1, 0, 0), z_dir=(0, 1, 0))) as fillet1_piece_24:
        with BuildLine():
            CenterArc((1.6 + FILLET1_R, FILLET1_R), FILLET1_R, 180, 90)
            Line((1.6 + FILLET1_R, 0), (1.6, 0))
            Line((1.6, 0), (1.6, FILLET1_R))
        make_face()
    revolve(axis=Axis((-5.82, 25.615, 10), (0, 0, -1)), mode=Mode.SUBTRACT)
    with BuildSketch(Plane(origin=(-5.82, 25.615, 15), x_dir=(1, 0, 0), z_dir=(0, -1, 0))) as fillet1_piece_25:
        with BuildLine():
            CenterArc((2.952572206 + FILLET1_R, -FILLET1_R), FILLET1_R, 90, 90)
            Line((2.952572206, -FILLET1_R), (2.952572206, 0))
            Line((2.952572206, 0), (2.952572206 + FILLET1_R, 0))
        make_face()
    revolve(axis=Axis((-5.82, 25.615, 15), (0, 0, 1)), mode=Mode.SUBTRACT)
    with BuildSketch(Plane(origin=(9.82, 28.615, 15), x_dir=(-1, 0, 0), z_dir=(0, -1, 0))) as fillet1_piece_26:
        with BuildLine():
            CenterArc((FILLET1_R, FILLET1_R), FILLET1_R, 180, 90)
            Line((0, FILLET1_R), (0, 0))
            Line((0, 0), (FILLET1_R, 0))
        make_face()
    extrude(amount=57.23, mode=Mode.SUBTRACT)


solid = part.part
